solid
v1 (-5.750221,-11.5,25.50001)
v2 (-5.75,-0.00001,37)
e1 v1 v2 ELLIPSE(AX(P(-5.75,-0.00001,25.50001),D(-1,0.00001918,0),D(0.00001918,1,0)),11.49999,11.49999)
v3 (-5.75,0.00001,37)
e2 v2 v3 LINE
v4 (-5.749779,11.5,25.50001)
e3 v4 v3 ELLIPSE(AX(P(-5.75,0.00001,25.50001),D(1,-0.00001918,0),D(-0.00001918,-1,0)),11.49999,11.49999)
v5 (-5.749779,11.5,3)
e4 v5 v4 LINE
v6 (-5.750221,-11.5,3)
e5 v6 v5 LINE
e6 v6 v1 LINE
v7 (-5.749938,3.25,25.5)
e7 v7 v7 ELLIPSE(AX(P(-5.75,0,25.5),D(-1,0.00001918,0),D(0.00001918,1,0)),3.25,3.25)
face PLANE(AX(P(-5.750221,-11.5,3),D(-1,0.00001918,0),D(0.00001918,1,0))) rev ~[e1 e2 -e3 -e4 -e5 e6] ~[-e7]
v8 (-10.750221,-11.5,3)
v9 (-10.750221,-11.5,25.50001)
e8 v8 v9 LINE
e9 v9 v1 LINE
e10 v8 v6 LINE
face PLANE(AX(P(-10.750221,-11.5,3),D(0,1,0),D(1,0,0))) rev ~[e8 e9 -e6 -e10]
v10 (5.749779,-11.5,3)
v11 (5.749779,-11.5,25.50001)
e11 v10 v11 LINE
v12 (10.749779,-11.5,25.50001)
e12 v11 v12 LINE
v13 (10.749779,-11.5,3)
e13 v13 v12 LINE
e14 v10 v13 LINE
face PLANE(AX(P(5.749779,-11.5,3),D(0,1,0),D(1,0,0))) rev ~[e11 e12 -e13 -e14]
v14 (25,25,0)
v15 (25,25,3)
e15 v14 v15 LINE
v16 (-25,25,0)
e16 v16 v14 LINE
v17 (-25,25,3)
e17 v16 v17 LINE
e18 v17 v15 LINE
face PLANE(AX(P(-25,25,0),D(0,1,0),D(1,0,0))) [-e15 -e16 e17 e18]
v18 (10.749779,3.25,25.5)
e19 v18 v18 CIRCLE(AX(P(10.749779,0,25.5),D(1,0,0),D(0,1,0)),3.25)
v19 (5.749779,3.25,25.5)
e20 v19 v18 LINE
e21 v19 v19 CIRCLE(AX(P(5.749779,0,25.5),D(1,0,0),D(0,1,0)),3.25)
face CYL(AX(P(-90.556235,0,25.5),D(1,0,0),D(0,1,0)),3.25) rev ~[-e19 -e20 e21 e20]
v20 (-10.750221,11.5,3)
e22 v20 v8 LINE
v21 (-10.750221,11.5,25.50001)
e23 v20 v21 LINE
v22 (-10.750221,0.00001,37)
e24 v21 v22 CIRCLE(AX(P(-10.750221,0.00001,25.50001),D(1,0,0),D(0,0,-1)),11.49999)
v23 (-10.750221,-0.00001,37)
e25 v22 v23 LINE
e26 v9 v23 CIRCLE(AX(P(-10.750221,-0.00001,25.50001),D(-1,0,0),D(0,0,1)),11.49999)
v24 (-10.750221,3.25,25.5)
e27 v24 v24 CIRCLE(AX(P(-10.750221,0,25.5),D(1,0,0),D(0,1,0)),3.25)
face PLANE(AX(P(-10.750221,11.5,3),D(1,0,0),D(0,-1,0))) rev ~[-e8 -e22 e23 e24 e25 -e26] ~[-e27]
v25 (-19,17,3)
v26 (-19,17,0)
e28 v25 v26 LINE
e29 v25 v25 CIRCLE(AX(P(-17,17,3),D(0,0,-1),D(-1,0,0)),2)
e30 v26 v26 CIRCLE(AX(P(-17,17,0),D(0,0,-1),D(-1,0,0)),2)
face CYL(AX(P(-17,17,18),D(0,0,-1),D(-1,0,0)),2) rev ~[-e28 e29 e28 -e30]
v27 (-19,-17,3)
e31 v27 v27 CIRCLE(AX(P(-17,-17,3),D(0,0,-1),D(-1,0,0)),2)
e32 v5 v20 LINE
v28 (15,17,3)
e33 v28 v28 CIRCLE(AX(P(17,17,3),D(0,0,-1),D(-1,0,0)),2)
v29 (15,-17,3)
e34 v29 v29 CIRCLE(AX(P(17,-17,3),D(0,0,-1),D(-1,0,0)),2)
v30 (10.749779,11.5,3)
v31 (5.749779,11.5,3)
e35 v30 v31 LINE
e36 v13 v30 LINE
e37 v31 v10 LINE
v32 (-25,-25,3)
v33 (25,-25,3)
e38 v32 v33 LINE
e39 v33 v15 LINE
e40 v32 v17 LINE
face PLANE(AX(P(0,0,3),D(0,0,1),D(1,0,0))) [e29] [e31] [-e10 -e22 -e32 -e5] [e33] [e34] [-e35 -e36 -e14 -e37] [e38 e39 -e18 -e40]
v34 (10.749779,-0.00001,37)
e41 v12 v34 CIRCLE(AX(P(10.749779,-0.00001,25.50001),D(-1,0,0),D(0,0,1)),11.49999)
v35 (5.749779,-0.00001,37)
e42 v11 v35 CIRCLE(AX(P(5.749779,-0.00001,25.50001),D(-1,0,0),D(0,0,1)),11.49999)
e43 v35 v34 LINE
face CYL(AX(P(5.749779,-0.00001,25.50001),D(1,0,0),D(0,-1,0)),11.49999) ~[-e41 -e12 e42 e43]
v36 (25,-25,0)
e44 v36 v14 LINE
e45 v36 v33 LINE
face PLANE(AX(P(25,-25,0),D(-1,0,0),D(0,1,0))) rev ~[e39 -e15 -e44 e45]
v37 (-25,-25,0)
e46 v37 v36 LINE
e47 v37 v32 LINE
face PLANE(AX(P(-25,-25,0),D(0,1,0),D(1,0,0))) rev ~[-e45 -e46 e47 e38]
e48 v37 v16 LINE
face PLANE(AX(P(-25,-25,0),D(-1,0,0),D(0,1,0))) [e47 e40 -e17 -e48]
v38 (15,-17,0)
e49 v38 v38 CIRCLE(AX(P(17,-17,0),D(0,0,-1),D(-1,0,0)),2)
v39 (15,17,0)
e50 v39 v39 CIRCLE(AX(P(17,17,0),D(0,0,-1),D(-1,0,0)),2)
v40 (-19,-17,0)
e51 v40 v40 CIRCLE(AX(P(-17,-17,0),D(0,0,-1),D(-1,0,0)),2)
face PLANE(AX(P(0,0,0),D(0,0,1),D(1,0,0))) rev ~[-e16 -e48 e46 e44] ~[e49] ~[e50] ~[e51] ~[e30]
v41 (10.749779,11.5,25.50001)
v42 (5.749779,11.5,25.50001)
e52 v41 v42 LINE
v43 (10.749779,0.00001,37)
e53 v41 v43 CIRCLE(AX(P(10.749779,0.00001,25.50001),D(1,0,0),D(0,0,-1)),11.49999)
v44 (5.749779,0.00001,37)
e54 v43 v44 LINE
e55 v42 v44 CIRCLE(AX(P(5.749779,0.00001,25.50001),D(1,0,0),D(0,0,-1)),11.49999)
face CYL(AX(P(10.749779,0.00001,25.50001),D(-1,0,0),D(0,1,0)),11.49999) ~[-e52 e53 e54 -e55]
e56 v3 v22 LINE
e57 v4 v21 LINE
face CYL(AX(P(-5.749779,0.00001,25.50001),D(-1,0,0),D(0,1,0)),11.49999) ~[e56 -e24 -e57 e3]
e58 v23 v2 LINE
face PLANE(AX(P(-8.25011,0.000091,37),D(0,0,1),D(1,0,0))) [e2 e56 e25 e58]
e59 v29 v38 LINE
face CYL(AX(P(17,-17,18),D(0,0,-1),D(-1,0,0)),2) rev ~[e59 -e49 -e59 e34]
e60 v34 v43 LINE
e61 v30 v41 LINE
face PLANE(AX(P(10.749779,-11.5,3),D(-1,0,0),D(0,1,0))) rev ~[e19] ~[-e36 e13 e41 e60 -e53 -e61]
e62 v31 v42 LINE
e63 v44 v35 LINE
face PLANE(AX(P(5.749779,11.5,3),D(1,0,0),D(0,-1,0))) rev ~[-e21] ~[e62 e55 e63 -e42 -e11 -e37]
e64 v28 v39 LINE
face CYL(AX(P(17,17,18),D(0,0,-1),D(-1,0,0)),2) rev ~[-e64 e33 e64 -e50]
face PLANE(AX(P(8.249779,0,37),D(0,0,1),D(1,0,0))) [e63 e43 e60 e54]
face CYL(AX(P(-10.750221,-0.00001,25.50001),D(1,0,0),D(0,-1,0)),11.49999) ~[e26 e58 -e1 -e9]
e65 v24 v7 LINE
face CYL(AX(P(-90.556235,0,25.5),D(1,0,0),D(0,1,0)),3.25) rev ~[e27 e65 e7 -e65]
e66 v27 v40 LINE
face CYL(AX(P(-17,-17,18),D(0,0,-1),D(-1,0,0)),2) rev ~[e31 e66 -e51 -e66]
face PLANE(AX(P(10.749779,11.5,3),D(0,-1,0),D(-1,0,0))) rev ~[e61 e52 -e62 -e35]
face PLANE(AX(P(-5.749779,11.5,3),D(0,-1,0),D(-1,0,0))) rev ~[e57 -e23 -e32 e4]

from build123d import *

# Parameters (mm, degrees)
F0_W     = 50
F0_H     = 50
F1_DEPTH = 3
F3_DEPTH = 34
F4_R     = 11.49999
F6_D     = 6.5
F8_D     = 4
F8_DEPTH = 15
F8_TIP   = 1.2017212381


# Not quite as in the source:
# - a fillet or chamfer is up to 0.001 mm smaller than in the source, because OpenCascade refuses the exact size


with BuildPart() as f1:
    # F0 (on Top) → F1 (new body)
    with BuildSketch(Plane.XY):
        Rectangle(F0_W, F0_H)
    extrude(amount=F1_DEPTH)

    # F2 (on face) → F3 (join)
    with BuildSketch(Plane.XY.offset(3)):
        Polygon((5.74977943, 11.5), (5.74977943, 0), (5.74977943, -11.4999999979), (10.74977943, -11.4999999979), (10.74977943, 2.1e-09), (10.74977943, 11.5), align=None)
        Polygon((-5.75022057, -11.4999999979), (-5.75, 0), (-5.74977943, 11.5000000021), (-10.75022057, 11.5000000021), (-10.75022057, 2.1e-09), (-10.75022057, -11.4999999979), align=None)
    extrude(amount=F3_DEPTH)

    # F4 (radius 11.5 in the source; OpenCascade refuses exactly that, so slightly less here)
    f4_edges = [f1.edges().sort_by_distance(p)[0] for p in [
        (-8.250221, -11.5, 37),
        (8.249779, -11.5, 37),
        (8.249779, 11.5, 37),
        (-8.25, 11.5, 37),
    ]]
    fillet(f4_edges, radius=F4_R)

    # F6 (through all)
    with Locations(Plane(origin=(-10.75022057, 0, 0), x_dir=(0, -1, 0), z_dir=(-1, 0, 0))):
        with Locations((-2.1e-09, 25.5)):
            Hole(F6_D / 2)

    # F8
    with Locations(Plane.XY.offset(3)):
        with Locations((-17, 17), (17, 17), (17, -17), (-17, -17)):
            Hole(F8_D / 2, depth=F8_DEPTH)
            with Locations((0, 0, -(F8_DEPTH + F8_TIP / 2))):  # 118° drill point
                Cone(0, F8_D / 2, F8_TIP, mode=Mode.SUBTRACT)


solid = f1.part
